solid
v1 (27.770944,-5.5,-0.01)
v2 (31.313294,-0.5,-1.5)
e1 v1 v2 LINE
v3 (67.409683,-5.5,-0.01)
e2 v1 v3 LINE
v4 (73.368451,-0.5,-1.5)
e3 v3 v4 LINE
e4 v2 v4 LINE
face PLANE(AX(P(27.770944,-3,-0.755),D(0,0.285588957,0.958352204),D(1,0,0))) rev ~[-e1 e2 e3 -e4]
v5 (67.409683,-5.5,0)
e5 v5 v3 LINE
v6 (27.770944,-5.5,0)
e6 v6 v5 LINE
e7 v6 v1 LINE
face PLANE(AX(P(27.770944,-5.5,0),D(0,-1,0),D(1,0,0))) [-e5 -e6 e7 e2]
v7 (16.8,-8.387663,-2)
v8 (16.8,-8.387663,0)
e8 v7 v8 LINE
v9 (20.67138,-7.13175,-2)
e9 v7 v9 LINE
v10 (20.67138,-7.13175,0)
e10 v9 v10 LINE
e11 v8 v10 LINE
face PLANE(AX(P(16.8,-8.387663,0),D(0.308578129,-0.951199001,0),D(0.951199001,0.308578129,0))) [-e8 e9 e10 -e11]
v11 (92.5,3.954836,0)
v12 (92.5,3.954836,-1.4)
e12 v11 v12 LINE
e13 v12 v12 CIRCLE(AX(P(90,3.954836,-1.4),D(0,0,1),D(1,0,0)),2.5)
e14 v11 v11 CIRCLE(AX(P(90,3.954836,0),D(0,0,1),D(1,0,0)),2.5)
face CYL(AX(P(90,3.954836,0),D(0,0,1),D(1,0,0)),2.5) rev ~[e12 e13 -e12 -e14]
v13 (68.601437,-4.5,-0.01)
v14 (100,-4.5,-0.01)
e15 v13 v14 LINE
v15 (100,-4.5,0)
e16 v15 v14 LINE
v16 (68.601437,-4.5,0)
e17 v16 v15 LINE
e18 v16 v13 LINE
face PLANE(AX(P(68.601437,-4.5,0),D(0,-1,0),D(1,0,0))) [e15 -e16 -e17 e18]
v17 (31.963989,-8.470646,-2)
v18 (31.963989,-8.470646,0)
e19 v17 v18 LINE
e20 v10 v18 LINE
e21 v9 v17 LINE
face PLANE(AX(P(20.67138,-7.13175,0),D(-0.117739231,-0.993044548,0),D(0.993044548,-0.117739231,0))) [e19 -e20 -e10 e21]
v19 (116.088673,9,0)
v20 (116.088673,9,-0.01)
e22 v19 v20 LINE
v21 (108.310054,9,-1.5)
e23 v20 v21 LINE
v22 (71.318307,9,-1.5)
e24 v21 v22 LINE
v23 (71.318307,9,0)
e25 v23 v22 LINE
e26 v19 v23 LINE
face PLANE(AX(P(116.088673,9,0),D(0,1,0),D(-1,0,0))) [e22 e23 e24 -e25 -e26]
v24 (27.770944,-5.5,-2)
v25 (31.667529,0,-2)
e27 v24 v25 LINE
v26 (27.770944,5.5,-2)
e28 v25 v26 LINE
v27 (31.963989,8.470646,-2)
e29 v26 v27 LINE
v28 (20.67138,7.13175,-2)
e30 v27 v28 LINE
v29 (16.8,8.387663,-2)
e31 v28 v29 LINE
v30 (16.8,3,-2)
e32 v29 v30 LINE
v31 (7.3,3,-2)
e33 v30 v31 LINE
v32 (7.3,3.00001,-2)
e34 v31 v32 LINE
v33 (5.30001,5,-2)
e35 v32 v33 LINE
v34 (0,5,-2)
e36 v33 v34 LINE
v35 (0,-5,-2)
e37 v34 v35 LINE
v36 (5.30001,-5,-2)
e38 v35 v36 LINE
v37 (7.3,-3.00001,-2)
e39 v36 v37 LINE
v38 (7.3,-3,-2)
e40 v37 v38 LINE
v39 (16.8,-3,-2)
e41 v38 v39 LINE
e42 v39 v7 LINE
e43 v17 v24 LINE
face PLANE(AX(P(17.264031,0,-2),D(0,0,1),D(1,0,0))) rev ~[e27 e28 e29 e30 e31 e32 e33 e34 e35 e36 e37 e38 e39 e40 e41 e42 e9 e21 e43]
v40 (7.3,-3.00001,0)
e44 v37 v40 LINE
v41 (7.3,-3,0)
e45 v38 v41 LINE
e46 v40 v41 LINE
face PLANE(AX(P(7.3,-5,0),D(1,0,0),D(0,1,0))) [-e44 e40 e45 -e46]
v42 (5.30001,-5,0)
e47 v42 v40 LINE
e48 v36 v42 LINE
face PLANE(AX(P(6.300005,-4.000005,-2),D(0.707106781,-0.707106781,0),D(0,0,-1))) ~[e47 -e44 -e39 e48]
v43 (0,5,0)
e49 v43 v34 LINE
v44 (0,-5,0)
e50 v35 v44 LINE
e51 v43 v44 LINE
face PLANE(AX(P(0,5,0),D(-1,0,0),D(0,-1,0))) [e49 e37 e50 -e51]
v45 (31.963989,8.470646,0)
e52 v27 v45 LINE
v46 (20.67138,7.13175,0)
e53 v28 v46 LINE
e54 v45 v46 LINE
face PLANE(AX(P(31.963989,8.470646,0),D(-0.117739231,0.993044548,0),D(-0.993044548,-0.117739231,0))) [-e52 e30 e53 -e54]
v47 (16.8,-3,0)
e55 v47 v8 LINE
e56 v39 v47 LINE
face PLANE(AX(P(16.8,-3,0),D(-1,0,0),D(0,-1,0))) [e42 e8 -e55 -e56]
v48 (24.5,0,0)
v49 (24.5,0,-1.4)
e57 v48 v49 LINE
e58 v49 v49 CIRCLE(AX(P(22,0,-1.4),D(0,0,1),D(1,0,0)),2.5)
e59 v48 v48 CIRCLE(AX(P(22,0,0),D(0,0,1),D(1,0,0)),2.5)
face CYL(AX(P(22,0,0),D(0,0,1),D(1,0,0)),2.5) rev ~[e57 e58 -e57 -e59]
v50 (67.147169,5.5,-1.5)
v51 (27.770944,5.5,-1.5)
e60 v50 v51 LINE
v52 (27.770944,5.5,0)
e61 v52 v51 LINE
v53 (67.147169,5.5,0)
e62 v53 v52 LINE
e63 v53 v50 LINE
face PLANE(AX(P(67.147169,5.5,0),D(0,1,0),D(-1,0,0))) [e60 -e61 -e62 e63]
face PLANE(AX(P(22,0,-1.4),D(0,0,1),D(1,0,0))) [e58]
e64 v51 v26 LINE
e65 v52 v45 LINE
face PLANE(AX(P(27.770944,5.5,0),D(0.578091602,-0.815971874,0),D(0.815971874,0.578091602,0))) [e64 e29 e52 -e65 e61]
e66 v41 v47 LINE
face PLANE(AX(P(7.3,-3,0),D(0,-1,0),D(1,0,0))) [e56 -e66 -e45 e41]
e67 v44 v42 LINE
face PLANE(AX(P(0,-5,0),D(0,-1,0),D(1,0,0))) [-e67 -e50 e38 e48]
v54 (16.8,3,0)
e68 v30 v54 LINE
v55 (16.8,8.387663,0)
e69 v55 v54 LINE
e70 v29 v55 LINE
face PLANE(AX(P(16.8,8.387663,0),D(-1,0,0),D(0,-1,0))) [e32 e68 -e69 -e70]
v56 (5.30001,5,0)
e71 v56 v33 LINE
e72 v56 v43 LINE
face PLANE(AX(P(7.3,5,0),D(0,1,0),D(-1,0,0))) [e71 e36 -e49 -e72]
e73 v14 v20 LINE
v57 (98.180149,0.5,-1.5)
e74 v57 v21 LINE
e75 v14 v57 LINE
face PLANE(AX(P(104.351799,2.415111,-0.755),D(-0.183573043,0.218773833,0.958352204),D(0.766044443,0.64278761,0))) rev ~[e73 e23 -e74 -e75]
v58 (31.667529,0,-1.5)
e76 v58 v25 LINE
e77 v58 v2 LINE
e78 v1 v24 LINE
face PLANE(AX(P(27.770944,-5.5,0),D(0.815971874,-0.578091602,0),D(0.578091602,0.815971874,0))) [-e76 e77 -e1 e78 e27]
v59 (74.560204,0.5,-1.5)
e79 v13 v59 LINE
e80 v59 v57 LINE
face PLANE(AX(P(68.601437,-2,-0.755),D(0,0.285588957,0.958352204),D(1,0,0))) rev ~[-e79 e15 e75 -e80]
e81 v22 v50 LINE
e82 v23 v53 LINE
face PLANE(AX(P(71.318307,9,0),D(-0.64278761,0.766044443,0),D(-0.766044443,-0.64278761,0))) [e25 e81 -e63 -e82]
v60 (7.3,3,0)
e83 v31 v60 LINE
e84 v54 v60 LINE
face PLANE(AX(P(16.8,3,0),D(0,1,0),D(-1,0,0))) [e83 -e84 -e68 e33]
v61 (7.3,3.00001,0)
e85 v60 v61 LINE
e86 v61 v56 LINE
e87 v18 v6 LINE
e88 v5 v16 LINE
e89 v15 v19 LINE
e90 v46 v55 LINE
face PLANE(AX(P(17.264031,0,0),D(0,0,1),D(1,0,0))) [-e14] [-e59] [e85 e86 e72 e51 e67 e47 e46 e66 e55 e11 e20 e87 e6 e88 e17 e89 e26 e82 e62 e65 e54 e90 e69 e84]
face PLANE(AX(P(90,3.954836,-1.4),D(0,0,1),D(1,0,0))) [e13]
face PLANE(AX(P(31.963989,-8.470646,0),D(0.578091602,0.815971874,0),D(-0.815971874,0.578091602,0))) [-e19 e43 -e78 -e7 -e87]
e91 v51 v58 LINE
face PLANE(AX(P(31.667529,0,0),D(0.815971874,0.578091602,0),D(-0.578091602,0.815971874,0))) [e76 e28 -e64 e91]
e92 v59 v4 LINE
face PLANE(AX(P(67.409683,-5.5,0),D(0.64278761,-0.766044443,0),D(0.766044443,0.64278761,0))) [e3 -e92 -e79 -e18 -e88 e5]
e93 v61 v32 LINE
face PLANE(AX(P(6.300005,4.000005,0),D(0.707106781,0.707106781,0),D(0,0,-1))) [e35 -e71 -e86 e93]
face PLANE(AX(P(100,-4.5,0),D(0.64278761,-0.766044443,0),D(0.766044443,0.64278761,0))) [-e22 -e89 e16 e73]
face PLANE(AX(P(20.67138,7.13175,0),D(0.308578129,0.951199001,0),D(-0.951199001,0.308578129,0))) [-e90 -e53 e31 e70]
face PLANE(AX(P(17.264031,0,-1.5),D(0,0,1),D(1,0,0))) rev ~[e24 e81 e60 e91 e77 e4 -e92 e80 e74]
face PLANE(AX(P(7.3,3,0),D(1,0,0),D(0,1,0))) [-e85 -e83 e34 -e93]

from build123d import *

# Parameters (mm, degrees)
F1_DEPTH = 2
F2_DEPTH = 1.5
F3_SIZE2 = 5
F3_SIZE  = 1.49
F4_SIZE2 = 5
F4_SIZE  = 1.49
F5_SIZE2 = 5
F5_SIZE  = 1.49
F6_SIZE  = 1.99999
F7_R     = 2.5
F8_DEPTH = 1.4


# Not quite as in the source:
# - a fillet or chamfer is up to 0.001 mm smaller than in the source, because OpenCascade refuses the exact size


with BuildPart() as f1:
    # F0 (on Top) → F1 (new body)
    with BuildSketch(Plane.XY):
        Polygon((0, 5), (0, 0), (0, -5), (7.3, -5), (7.3, -3), (16.8, -3), (16.8, -8.3876634017), (20.6713799321, -7.1317504184), (31.9639886349, -8.4706461057), (27.770944377, -5.5), (31.6675294298, 0), (27.770944377, 5.5), (31.9639886349, 8.4706461057), (20.6713799321, 7.1317504184), (16.8, 8.3876634017), (16.8, 3), (7.3, 3), (7.3, 5), align=None)
    extrude(amount=-F1_DEPTH)

    # F0 (on Top) → F2 (join)
    with BuildSketch(Plane.XY):
        Polygon((0, 5), (0, 0), (0, -5), (7.3, -5), (7.3, -3), (16.8, -3), (16.8, -8.3876634017), (20.6713799321, -7.1317504184), (31.9639886349, -8.4706461057), (27.770944377, -5.5), (31.6675294298, 0), (27.770944377, 5.5), (31.9639886349, 8.4706461057), (20.6713799321, 7.1317504184), (16.8, 8.3876634017), (16.8, 3), (7.3, 3), (7.3, 5), align=None)
        Polygon((67.1471691582, 5.5), (27.770944377, 5.5), (31.6675294298, 0), (27.770944377, -5.5), (67.4096829149, -5.5), (68.6014365075, -4.5), (100, -4.5), (116.0886735, 9), (71.3183067322, 9), align=None)
    extrude(amount=-F2_DEPTH)

    # F3
    f3_edges = [f1.edges().sort_by_distance(p)[0] for p in [
        (84.300718, -4.5, -1.5),
    ]]
    f3_side = f1.faces().sort_by_distance((84.300718, -4.5, -0.75))[0]
    chamfer(f3_edges, length=F3_SIZE, length2=F3_SIZE2, reference=f3_side)

    # F4
    f4_edges = [f1.edges().sort_by_distance(p)[0] for p in [
        (47.590314, -5.5, -1.5),
    ]]
    f4_side = f1.faces().sort_by_distance((47.590314, -5.5, -0.75))[0]
    chamfer(f4_edges, length=F4_SIZE, length2=F4_SIZE2, reference=f4_side)

    # F5
    f5_edges = [f1.edges().sort_by_distance(p)[0] for p in [
        (111.023721, 4.75, -1.5),
    ]]
    f5_side = f1.faces().sort_by_distance((109.409925, 3.395865, -0.692895))[0]
    chamfer(f5_edges, length=F5_SIZE, length2=F5_SIZE2, reference=f5_side)

    # F6 (size 2 in the source; OpenCascade refuses exactly that, so slightly less here)
    f6_edges = [f1.edges().sort_by_distance(p)[0] for p in [
        (7.3, 5, -1),
        (7.3, -5, -1),
    ]]
    chamfer(f6_edges, length=F6_SIZE)

    # F7 (on Top) → F8 (cut)
    with BuildSketch(Plane.XY):
        with Locations((22, 0)):
            Circle(F7_R)
        with Locations((90, 3.9548357017)):
            Circle(F7_R)
    extrude(amount=-F8_DEPTH, mode=Mode.SUBTRACT)


solid = f1.part
